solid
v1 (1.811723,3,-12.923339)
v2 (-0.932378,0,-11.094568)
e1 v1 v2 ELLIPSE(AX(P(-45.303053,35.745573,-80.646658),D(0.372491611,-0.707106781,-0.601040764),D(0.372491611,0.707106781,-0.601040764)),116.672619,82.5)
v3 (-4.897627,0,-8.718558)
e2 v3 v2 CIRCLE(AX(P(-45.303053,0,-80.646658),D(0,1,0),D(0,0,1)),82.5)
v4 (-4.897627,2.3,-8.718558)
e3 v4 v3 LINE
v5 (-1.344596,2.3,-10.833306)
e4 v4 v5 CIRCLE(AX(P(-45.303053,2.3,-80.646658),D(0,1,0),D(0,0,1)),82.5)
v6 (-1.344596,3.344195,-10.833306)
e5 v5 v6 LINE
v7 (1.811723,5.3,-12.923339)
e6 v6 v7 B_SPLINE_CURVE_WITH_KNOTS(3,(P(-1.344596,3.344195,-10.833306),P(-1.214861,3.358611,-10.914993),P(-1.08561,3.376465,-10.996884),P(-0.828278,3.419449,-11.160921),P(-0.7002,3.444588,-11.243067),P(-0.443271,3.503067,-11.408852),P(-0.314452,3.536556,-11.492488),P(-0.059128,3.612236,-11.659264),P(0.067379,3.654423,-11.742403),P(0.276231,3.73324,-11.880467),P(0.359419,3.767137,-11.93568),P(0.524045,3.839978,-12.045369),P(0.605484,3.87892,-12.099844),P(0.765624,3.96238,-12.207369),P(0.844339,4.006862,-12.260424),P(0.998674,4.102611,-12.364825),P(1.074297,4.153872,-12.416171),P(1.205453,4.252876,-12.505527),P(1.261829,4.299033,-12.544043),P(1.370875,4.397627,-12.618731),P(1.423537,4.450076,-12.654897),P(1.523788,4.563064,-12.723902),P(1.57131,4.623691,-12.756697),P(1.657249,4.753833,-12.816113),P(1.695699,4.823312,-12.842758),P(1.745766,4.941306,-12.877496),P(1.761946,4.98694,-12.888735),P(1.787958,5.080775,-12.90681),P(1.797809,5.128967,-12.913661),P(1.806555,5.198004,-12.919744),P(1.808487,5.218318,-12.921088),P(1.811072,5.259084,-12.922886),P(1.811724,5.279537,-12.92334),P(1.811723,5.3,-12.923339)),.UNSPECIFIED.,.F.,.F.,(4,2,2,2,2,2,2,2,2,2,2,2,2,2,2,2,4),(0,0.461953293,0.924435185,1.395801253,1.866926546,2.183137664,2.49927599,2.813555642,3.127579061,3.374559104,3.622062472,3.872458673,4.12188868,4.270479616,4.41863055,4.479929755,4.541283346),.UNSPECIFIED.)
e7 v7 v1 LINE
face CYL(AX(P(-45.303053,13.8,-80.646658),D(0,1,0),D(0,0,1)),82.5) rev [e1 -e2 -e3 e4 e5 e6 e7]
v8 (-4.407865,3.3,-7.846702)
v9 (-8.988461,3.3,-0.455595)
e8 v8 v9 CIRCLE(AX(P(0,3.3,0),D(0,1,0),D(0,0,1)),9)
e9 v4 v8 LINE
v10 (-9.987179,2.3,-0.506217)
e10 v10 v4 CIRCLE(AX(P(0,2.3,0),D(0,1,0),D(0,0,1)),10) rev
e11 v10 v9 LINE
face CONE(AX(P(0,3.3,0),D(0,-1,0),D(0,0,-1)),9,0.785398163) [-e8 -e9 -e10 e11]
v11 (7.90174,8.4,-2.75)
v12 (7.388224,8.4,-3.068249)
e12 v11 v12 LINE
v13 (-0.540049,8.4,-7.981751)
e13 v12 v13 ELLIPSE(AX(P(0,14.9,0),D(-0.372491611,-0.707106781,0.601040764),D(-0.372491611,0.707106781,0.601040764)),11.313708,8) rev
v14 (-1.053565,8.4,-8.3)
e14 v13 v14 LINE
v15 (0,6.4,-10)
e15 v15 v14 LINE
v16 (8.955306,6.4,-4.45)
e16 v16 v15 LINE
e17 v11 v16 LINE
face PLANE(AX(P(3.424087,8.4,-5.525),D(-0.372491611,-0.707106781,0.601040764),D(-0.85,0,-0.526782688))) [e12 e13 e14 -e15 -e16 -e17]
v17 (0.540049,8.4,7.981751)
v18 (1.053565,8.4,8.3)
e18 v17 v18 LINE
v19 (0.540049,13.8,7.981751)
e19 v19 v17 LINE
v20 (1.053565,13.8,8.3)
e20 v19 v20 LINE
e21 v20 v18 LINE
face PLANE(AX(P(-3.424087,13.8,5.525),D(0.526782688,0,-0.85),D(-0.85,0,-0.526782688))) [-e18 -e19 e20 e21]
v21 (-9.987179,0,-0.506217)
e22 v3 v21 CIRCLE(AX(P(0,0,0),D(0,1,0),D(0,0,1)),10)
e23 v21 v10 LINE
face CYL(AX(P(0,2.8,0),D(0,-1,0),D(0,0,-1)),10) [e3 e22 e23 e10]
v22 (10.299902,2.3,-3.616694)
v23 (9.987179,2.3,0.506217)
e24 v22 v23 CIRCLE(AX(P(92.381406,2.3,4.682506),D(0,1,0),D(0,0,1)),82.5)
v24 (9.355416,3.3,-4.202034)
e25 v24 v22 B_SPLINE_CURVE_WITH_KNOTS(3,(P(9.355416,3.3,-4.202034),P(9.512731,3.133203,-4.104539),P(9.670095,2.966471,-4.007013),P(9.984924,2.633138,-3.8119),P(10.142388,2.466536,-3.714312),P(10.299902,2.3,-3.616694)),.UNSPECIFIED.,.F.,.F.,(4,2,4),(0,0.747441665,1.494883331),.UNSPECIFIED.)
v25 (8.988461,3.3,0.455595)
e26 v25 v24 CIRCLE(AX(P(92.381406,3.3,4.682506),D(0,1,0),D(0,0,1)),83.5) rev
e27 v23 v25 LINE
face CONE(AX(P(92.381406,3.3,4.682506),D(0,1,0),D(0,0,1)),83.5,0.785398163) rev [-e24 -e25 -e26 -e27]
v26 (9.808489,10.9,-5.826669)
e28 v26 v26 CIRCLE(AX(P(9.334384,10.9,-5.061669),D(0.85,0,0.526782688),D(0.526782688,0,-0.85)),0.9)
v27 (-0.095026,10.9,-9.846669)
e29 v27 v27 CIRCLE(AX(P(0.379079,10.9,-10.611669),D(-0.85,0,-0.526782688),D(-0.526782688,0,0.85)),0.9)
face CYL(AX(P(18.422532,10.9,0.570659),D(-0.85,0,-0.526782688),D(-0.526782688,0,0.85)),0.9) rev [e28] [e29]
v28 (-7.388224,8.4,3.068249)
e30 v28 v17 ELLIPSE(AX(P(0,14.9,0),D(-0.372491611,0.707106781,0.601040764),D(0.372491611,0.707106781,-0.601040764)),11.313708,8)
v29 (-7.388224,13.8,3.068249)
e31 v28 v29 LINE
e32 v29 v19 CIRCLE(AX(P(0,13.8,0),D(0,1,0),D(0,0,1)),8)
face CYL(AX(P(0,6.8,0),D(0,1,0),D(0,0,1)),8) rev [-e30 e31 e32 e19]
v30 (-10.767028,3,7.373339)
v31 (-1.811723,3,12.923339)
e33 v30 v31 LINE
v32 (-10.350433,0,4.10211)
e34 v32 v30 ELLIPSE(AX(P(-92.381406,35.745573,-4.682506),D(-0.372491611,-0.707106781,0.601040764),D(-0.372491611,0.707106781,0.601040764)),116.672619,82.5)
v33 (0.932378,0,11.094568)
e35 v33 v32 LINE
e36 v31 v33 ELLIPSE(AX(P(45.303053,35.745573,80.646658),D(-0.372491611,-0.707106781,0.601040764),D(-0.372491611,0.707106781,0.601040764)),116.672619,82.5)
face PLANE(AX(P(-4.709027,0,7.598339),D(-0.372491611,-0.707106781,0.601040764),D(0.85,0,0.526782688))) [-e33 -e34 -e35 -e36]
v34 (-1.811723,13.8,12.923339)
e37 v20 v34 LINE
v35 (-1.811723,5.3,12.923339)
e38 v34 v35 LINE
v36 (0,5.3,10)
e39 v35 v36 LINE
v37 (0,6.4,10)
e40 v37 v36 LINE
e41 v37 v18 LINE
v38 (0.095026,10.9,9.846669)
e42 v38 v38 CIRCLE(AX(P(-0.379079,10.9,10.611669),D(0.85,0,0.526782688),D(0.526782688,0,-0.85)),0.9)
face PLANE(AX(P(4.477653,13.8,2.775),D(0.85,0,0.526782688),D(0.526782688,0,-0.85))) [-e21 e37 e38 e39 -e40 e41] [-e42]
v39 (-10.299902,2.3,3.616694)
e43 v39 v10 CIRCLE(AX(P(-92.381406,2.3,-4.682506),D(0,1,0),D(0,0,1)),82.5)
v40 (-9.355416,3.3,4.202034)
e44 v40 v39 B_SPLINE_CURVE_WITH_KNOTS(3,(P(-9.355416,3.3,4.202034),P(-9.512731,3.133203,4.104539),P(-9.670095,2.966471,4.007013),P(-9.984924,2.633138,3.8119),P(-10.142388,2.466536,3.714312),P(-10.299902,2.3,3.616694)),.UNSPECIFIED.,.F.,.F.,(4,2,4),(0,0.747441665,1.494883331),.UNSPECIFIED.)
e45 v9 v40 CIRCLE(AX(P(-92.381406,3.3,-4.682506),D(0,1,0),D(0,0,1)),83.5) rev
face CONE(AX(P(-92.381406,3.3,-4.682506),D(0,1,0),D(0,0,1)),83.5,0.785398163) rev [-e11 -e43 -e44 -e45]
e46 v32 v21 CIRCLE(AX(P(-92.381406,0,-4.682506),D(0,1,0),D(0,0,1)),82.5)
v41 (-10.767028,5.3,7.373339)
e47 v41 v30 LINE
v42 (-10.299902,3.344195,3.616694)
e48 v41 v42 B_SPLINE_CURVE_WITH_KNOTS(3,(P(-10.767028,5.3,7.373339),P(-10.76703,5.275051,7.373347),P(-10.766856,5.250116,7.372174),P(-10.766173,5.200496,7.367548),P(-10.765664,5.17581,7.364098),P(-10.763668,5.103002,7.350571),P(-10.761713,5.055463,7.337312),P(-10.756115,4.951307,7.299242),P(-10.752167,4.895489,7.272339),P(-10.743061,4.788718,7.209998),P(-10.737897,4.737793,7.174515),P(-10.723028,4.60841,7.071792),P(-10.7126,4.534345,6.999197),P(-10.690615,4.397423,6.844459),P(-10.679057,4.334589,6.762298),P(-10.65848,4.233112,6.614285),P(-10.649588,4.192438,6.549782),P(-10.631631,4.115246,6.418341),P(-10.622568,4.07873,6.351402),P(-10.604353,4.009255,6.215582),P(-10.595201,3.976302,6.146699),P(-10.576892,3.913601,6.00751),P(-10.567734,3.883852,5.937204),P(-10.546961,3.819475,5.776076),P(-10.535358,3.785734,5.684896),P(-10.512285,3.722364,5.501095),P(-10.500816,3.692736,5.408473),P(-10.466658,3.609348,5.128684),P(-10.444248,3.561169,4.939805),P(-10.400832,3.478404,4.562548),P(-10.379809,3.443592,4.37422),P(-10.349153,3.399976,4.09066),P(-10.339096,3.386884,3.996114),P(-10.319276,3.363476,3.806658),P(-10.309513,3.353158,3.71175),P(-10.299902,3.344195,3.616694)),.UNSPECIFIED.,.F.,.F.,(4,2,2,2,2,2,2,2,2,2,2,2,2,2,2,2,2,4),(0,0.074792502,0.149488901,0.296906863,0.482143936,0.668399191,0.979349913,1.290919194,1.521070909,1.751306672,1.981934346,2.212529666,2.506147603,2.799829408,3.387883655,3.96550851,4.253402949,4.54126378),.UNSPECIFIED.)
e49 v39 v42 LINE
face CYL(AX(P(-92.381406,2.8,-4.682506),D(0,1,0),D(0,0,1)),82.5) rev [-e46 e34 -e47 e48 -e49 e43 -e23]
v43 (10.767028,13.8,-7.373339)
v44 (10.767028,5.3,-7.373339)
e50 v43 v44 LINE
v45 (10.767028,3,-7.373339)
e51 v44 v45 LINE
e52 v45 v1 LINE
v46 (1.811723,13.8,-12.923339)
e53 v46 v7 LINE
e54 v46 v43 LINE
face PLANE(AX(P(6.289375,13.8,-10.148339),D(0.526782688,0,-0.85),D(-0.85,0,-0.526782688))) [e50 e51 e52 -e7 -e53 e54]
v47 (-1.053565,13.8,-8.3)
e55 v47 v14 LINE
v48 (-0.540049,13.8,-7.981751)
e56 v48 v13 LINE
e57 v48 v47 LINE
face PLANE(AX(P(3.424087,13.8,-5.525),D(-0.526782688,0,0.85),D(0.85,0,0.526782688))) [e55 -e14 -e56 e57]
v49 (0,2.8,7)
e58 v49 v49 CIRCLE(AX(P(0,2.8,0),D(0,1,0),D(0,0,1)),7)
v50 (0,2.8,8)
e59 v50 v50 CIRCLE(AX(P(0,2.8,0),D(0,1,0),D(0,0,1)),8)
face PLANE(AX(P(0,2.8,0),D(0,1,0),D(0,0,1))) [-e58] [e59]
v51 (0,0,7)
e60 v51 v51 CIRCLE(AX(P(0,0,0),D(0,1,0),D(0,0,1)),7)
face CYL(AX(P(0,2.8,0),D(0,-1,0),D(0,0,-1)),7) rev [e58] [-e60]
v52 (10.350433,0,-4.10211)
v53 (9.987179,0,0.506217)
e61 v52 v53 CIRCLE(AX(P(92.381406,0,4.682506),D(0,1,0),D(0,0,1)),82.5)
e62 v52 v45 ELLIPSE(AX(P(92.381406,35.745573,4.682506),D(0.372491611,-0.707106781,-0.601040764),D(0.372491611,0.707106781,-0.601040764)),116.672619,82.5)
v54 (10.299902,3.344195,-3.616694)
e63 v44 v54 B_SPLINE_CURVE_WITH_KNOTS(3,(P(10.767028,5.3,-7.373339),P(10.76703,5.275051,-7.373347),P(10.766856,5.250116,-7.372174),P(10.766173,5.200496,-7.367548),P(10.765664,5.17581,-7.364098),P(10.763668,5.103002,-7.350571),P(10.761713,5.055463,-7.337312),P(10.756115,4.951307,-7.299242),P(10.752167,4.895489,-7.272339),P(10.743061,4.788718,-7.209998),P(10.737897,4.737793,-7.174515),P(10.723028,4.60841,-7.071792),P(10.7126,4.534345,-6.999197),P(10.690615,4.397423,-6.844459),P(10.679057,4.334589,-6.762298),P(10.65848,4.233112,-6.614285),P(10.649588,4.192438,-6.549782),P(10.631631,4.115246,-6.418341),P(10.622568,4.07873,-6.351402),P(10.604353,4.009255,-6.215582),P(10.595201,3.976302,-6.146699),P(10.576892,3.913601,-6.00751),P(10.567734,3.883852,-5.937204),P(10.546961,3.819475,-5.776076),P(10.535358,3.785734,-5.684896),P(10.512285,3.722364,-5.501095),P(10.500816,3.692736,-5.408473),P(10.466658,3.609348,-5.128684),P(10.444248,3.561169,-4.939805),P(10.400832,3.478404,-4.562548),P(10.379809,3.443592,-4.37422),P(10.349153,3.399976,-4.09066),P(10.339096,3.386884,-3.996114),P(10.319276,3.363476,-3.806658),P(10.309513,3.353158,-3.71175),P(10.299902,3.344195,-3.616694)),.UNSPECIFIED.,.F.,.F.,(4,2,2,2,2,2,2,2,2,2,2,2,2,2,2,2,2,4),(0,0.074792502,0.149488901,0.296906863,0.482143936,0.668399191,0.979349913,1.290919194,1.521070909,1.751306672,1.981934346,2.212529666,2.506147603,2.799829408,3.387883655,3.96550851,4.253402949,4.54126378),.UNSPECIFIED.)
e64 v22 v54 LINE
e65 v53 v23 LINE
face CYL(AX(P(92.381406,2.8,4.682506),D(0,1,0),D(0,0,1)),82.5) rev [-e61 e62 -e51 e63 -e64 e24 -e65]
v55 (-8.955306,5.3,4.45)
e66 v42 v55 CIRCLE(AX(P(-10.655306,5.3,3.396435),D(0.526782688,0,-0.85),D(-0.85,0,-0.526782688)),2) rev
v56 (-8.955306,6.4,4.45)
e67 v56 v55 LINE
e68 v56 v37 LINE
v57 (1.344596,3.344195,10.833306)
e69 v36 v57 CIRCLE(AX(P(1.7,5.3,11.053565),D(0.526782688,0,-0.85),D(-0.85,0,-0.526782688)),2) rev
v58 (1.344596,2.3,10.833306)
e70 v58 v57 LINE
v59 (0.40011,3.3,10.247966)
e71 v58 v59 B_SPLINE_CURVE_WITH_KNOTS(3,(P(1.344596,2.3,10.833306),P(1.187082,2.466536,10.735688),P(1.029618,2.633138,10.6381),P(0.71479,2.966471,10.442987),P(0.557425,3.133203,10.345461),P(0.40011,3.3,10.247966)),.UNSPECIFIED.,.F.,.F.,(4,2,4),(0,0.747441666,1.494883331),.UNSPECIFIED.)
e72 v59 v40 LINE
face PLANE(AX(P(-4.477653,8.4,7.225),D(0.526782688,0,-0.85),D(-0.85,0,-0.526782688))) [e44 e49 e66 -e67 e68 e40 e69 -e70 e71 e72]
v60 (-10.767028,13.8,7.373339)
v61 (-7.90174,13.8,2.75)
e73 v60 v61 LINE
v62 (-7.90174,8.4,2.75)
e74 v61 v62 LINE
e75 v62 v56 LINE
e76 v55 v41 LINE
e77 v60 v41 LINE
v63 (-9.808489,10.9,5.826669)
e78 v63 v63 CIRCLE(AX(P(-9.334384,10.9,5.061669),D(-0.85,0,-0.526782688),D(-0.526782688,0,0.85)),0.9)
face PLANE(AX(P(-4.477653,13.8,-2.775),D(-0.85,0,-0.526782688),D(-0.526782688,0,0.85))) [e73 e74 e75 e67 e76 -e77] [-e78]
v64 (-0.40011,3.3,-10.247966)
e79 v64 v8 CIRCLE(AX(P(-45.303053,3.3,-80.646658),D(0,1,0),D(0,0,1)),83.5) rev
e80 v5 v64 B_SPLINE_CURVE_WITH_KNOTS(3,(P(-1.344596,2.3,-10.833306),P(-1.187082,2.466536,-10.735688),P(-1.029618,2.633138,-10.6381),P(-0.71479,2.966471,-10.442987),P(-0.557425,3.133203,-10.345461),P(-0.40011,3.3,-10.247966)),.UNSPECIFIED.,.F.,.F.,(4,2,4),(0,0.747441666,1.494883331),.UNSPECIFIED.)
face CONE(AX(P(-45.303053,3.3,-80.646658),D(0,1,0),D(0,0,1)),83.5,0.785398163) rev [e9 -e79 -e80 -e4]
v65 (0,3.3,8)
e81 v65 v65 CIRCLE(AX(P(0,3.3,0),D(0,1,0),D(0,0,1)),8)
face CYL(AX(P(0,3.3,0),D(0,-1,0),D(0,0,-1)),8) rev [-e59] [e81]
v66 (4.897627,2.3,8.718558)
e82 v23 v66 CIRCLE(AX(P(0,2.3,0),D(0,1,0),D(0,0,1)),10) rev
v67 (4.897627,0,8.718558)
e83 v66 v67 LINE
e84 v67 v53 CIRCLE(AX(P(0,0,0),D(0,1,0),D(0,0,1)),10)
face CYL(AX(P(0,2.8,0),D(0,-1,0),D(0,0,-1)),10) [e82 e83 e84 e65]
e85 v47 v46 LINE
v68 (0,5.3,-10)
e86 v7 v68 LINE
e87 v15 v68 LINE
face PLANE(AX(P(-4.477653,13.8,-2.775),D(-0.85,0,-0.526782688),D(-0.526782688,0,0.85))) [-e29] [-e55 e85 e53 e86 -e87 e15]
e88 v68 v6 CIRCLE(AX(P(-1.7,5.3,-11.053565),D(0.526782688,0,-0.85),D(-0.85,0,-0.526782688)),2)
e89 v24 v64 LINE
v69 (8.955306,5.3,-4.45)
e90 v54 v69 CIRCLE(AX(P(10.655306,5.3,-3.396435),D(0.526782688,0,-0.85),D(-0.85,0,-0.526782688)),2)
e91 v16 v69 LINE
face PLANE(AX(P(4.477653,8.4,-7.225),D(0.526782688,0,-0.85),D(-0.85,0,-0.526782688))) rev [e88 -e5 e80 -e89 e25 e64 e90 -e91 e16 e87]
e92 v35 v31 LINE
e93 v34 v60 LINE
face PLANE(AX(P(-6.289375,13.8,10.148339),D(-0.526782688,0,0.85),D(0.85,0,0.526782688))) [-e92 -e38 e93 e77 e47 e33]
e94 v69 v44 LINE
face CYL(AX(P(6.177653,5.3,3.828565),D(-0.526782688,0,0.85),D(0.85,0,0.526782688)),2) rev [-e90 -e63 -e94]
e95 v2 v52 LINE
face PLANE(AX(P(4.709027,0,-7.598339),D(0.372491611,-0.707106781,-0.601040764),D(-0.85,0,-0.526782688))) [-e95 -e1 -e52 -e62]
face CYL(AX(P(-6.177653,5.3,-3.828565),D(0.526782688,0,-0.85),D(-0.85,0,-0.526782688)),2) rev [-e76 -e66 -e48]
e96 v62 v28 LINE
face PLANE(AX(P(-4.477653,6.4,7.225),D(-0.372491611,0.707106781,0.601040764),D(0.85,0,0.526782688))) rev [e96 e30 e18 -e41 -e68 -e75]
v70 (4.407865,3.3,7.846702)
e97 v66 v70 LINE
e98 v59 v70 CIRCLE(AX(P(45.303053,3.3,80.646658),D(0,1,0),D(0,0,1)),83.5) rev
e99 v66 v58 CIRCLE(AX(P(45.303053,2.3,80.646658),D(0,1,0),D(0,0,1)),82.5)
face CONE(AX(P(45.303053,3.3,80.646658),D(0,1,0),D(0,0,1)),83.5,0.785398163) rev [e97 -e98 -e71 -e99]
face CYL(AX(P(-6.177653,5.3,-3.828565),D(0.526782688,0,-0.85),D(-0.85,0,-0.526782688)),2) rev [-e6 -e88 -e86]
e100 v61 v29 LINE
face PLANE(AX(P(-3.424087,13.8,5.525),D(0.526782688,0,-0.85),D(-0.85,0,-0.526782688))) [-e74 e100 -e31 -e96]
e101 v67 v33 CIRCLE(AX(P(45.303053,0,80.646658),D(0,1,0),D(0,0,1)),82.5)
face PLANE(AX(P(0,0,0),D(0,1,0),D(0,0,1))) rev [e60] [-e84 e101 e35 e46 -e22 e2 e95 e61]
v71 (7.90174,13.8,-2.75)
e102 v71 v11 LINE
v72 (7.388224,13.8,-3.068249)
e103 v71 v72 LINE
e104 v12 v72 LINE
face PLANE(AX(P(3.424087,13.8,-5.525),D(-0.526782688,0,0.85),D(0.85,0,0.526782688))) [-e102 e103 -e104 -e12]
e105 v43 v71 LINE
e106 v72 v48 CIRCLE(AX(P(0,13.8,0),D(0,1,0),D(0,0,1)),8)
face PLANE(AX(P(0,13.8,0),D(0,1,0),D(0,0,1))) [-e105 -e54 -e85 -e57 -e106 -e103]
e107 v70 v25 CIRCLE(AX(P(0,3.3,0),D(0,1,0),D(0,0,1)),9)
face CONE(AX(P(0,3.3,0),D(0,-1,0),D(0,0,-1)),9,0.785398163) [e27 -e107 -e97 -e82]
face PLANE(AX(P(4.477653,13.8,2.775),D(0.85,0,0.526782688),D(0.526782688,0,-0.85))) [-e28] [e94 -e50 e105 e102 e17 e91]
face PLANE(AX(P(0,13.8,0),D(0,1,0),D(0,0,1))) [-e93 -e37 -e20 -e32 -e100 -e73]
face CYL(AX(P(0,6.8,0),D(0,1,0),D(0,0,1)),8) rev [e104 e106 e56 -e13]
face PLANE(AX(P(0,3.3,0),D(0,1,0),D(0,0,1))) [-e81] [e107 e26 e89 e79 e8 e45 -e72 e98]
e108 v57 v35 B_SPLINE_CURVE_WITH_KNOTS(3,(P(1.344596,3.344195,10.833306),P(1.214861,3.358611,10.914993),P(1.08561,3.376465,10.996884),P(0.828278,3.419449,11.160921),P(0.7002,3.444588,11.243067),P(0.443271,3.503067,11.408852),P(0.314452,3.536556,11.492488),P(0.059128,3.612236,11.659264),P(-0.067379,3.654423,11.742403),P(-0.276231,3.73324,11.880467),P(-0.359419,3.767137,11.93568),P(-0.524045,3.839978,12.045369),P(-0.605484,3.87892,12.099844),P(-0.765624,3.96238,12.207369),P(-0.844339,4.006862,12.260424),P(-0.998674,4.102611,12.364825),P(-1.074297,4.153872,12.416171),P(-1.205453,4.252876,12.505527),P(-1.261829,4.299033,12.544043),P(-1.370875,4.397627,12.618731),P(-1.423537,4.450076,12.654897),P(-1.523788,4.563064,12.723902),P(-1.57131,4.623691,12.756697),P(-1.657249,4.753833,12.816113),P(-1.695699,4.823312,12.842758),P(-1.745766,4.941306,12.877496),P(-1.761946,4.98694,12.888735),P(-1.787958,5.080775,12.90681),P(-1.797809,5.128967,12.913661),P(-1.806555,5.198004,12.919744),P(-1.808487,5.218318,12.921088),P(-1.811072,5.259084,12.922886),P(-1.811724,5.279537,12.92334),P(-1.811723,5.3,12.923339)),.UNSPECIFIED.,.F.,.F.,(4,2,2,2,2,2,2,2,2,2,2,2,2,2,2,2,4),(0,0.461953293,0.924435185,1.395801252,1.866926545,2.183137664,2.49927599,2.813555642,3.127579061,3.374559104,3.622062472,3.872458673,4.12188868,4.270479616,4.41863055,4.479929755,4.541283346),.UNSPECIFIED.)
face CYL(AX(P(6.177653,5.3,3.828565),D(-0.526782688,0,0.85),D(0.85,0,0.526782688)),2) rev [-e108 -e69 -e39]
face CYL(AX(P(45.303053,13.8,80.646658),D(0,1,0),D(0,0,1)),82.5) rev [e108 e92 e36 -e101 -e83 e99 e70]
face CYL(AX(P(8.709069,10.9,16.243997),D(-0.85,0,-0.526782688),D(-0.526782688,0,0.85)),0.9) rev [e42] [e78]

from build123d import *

# Parameters (mm, degrees)
SKETCH_1_R          = 10
SKETCH_1_R_2        = 7
EXTRUDE_1_DEPTH     = 2.8
SKETCH_2_R          = 10
SKETCH_2_R_2        = 8
EXTRUDE_2_DEPTH     = 0.5
EXTRUDE_3_DEPTH     = 8.4
EXTRUDE_4_DEPTH     = 5.4
SKETCH_7_R          = 0.9
CUT_EXTRUDE_1_DEPTH = 26.870410541
CHAMFER_2_SIZE      = 2
EXTRUDE_5_REACH     = 23.757
FILLET_2_R          = 82.5
CHAMFER_4_SIZE      = 3
FILLET_3_R          = 2
CUT_EXTRUDE_START   = -7
SKETCH_9_R          = 8
CUT_EXTRUDE_2_DEPTH = 7
CHAMFER_5_SIZE      = 1


with BuildPart() as part:
    # 草图1 → 凸台-拉伸1 (new body)
    with BuildSketch(Plane(origin=(0, 0, 0), x_dir=(1, 0, 0), z_dir=(0, 1, 0))):
        with Locations(Location((0, 0, 0), (0, 0, 270))):
            Circle(SKETCH_1_R)
        with Locations(Location((0, 0, 0), (0, 0, 270))):
            Circle(SKETCH_1_R_2, mode=Mode.SUBTRACT)
    extrude(amount=EXTRUDE_1_DEPTH)

    # 草图2 → 凸台-拉伸2 (add)
    with BuildSketch(Plane(origin=(0, 2.8, 0), x_dir=(1, 0, 0), z_dir=(0, 1, 0))):
        with Locations(Location((0, 0, 0), (0, 0, 270))):
            Circle(SKETCH_2_R)
        with Locations(Location((0, 0, 0), (0, 0, 270))):
            Circle(SKETCH_2_R_2, mode=Mode.SUBTRACT)
    extrude(amount=EXTRUDE_2_DEPTH)

    # 草图3 → 凸台-拉伸3 (add)
    with BuildSketch(Plane.XZ):
        with BuildLine():
            ThreePointArc((0, 10), (-5.267826876, 8.5), (-8.95530569, 4.45))
            Line((-8.95530569, 4.45), (0, 10))
        make_face()
        with BuildLine():
            Line((8.95530569, -4.45), (0, -10))
            ThreePointArc((0, -10), (5.267826876, -8.5), (8.95530569, -4.45))
        make_face()
    extrude(amount=-EXTRUDE_3_DEPTH)

    # 草图5 → 凸台-拉伸4 (add)
    with BuildSketch(Plane(origin=(0, 8.4, 0), x_dir=(1, 0, 0), z_dir=(0, 1, 0))):
        Polygon((1.811722614, 12.923338709), (10.767028304, 7.373338709), (7.901740315, 2.75), (-1.053565375, 8.3), align=None)
        Polygon((-7.901740315, -2.75), (1.053565375, -8.3), (-1.811722614, -12.923338709), (-10.767028304, -7.373338709), align=None)
    extrude(amount=EXTRUDE_4_DEPTH)

    # 草图7 → 切除-拉伸1 (cut, through all)
    with BuildSketch(Plane(origin=(-4.477652845, 0, -2.775), x_dir=(-0.5267826876426366, 0, 0.8500000000000003), z_dir=(-0.8500000000000003, 0, -0.5267826876426366))):
        with Locations((9.219611005, 10.9)):
            Circle(SKETCH_7_R)
        with Locations((-9.219611005, 10.9)):
            Circle(SKETCH_7_R)
    extrude(amount=-CUT_EXTRUDE_1_DEPTH, mode=Mode.SUBTRACT)

    # 倒角2
    # the kernel refuses this chamfer: 2 mm, written as the material it adds along each edge
    with BuildSketch(Plane(origin=(-8.95530569, 8.4, 4.45), x_dir=(0, -1, 0), z_dir=(0.8500000000000002, 0, 0.5267826876426367))) as chamfer_2_piece_1_section:
        Polygon((CHAMFER_2_SIZE, 0), (0, CHAMFER_2_SIZE), (0, 0), align=None)
    chamfer_2_piece_1 = extrude(amount=10.535653753, mode=Mode.PRIVATE)
    chamfer_2_piece_1 = chamfer_2_piece_1 & Plane(origin=(0, 8.4, 0), x_dir=(0, 0, 1), z_dir=(0, -1, 0)) * Cylinder(10, 30, mode=Mode.PRIVATE)
    chamfer_2_piece_1 = split(chamfer_2_piece_1, bisect_by=Plane(origin=(-7.901740315, 8.4, 2.75), z_dir=(-0.5267826876426371, 0, 0.85)), keep=Keep.TOP, mode=Mode.PRIVATE)
    add(chamfer_2_piece_1)
    with BuildSketch(Plane(origin=(8.95530569, 8.4, -4.45), x_dir=(-0.5267826876426367, 0, 0.8500000000000002), z_dir=(-0.8500000000000002, 0, -0.5267826876426367))) as chamfer_2_piece_2_section:
        Polygon((CHAMFER_2_SIZE, 0), (0, -CHAMFER_2_SIZE), (0, 0), align=None)
    chamfer_2_piece_2 = extrude(amount=10.535653753, mode=Mode.PRIVATE)
    chamfer_2_piece_2 = chamfer_2_piece_2 & Plane(origin=(0, 8.4, 0), x_dir=(0, 0, -1), z_dir=(0, -1, 0)) * Cylinder(10, 30, mode=Mode.PRIVATE)
    chamfer_2_piece_2 = split(chamfer_2_piece_2, bisect_by=Plane(origin=(7.901740315, 8.4, -2.75), z_dir=(0.5267826876426374, 0, -0.8499999999999999)), keep=Keep.TOP, mode=Mode.PRIVATE)
    add(chamfer_2_piece_2)

    # 草图8 → 凸台-拉伸5 (add, up to next)
    with BuildSketch(Plane.XZ, mode=Mode.PRIVATE) as extrude_5_sk1:
        with BuildLine():
            Line((10.767028304, -7.373338709), (8.95530569, -4.45))
            ThreePointArc((8.95530569, -4.45), (5.267826876, -8.5), (0, -10))
            Line((0, -10), (1.811722614, -12.923338709))
            Line((1.811722614, -12.923338709), (10.767028304, -7.373338709))
        make_face()
    extrude_5_tool1 = extrude(extrude_5_sk1.sketch, amount=-EXTRUDE_5_REACH, mode=Mode.PRIVATE) - part.part
    # 草图8 → 凸台-拉伸5 (add, up to next)
    with BuildSketch(Plane.XZ, mode=Mode.PRIVATE) as extrude_5_sk2:
        with BuildLine():
            Line((-10.767028304, 7.373338709), (-8.95530569, 4.45))
            ThreePointArc((-8.95530569, 4.45), (-5.267826876, 8.5), (0, 10))
            Line((0, 10), (-1.811722614, 12.923338709))
            Line((-1.811722614, 12.923338709), (-10.767028304, 7.373338709))
        make_face()
    extrude_5_tool2 = extrude(extrude_5_sk2.sketch, amount=-EXTRUDE_5_REACH, mode=Mode.PRIVATE) - part.part
    add(extrude_5_tool1.solids().sort_by_distance((5.629921, 0, -9.084263))[0])
    add(extrude_5_tool2.solids().sort_by_distance((-5.629921, 0, 9.084263))[0])

    # 圆角2
    # the kernel refuses this fillet: 82.5 mm, written as the material it adds along each edge
    with BuildSketch(Plane(origin=(0, 0, -10), x_dir=(0.526782687642631, 0, -0.8500000000000036), z_dir=(0, 1, 0))) as fillet_2_piece_1:
        with BuildLine():
            CenterArc((36.184795451, 75.723030975), FILLET_2_R, 241.113318321, 5.501155307)
            ThreePointArc((-3.669211303, 3.48794154), (-1.610231073, 1.980006188), (0, 0))
            Line((0, 0), (3.43922201, 0))
        make_face()
    extrude(amount=3.3)
    with BuildSketch(Plane(origin=(8.95530569, 0, -4.45), x_dir=(0.203827060688438, 0, 0.9790069097463571), z_dir=(0, 1, 0))) as fillet_2_piece_2:
        with BuildLine():
            CenterArc((25.945282898, 79.813276697), FILLET_2_R, 249.836350841, 5.501155307)
            Line((-2.4926907, 2.369544494), (0, 0))
            ThreePointArc((0, 0), (2.531247112, 0.325663431), (5.062494224, 0))
        make_face()
    extrude(amount=3.3)
    with BuildSketch(Plane(origin=(0, 3.3, 10), x_dir=(-0.5267826876443492, 0, 0.8499999999989388), z_dir=(0, -1, 0)), Plane(origin=(-8.95530569, 0, 4.45), x_dir=(-0.5267826876426422, 0, 0.8499999999999966), z_dir=(0, 1, 0))) as fillet_2_piece_3:
        with BuildLine():
            CenterArc((36.184795451, -75.723030975), FILLET_2_R, 113.385526372, 5.501155307)
            ThreePointArc((-3.669211303, -3.48794154), (-1.610231073, -1.980006188), (0, 0))
            Line((0, 0), (3.43922201, 0))
        make_face()
    extrude(amount=3.3)

    # 倒角4
    chamfer_4_edges = [part.edges().sort_by_distance(p)[0] for p in [
        (6.289375459, 0, -10.148338709),
        (-6.289375459, 0, 10.148338709),
    ]]
    chamfer(chamfer_4_edges, length=CHAMFER_4_SIZE)

    # 圆角3
    # the kernel refuses this fillet: 2 mm, written as the material it adds along each edge
    with BuildSketch(Plane(origin=(0, 3.3, -10), x_dir=(-0.8499999999998374, 0, -0.5267826876428993), z_dir=(0.5267826876428993, 0, -0.8499999999998374))) as fillet_3_piece_1_section:
        with BuildLine():
            CenterArc((FILLET_3_R, FILLET_3_R), FILLET_3_R, 180, 90)
            Line((0, FILLET_3_R), (0, 0))
            Line((0, 0), (FILLET_3_R, 0))
        make_face()
    fillet_3_piece_1 = extrude(amount=3.43922201, mode=Mode.PRIVATE)
    fillet_3_piece_1 = fillet_3_piece_1 - Plane(origin=(-45.303052529, 3.3, -80.646657907), x_dir=(0.5267826876428993, 0, -0.8499999999998374), z_dir=(0, -1, 0)) * Cylinder(82.5, 15, mode=Mode.PRIVATE)
    add(fillet_3_piece_1)
    with BuildSketch(Plane(origin=(-8.95530569, 3.3, 4.45), x_dir=(-0.8499999999998374, 0, -0.5267826876428994), z_dir=(-0.5267826876428993, 0, 0.8499999999998374))) as fillet_3_piece_2_section:
        with BuildLine():
            CenterArc((FILLET_3_R, -FILLET_3_R), FILLET_3_R, 90, 90)
            Line((0, -FILLET_3_R), (0, 0))
            Line((0, 0), (FILLET_3_R, 0))
        make_face()
    fillet_3_piece_2 = extrude(amount=3.43922201, mode=Mode.PRIVATE)
    fillet_3_piece_2 = fillet_3_piece_2 - Plane(origin=(-92.381405818, 3.3, -4.682505639), x_dir=(-0.5267826876428993, 0, 0.8499999999998374), z_dir=(0, -1, 0)) * Cylinder(82.5, 15, mode=Mode.PRIVATE)
    add(fillet_3_piece_2)
    with BuildSketch(Plane(origin=(10.767028304, 3.3, -7.373338709), x_dir=(0.8499999999997903, 0, 0.5267826876429756), z_dir=(-0.5267826876429755, 0, 0.8499999999997901))) as fillet_3_piece_3_section:
        with BuildLine():
            CenterArc((FILLET_3_R, FILLET_3_R), FILLET_3_R, 180, 90)
            Line((0, FILLET_3_R), (0, 0))
            Line((0, 0), (FILLET_3_R, 0))
        make_face()
    fillet_3_piece_3 = extrude(amount=3.43922201, mode=Mode.PRIVATE)
    fillet_3_piece_3 = fillet_3_piece_3 - Plane(origin=(92.381405818, 3.3, 4.68250564), x_dir=(0.20382706068808945, 0, 0.9790069097464297), z_dir=(0, -1, 0)) * Cylinder(82.5, 15, mode=Mode.PRIVATE)
    add(fillet_3_piece_3)
    with BuildSketch(Plane(origin=(0, 3.3, 10), x_dir=(0.8499999999991121, 0, 0.5267826876440694), z_dir=(-0.5267826876440695, 0, 0.8499999999991122))) as fillet_3_piece_4_section:
        with BuildLine():
            CenterArc((FILLET_3_R, FILLET_3_R), FILLET_3_R, 180, 90)
            Line((0, FILLET_3_R), (0, 0))
            Line((0, 0), (FILLET_3_R, 0))
        make_face()
    fillet_3_piece_4 = extrude(amount=3.43922201, mode=Mode.PRIVATE)
    fillet_3_piece_4 = fillet_3_piece_4 - Plane(origin=(45.303052529, 3.3, 80.646657907), x_dir=(-0.5267826876440695, 0, 0.8499999999991122), z_dir=(0, 1, 0)) * Cylinder(82.5, 15, mode=Mode.PRIVATE)
    add(fillet_3_piece_4)

    # 草图9 → 切除-拉伸2 (cut)
    with BuildSketch(Plane(origin=(0, 13.8, 0), x_dir=(1, 0, 0), z_dir=(0, 1, 0)).offset(CUT_EXTRUDE_START)):
        with Locations(Location((0, 0, 0), (0, 0, 270))):
            Circle(SKETCH_9_R)
    extrude(amount=CUT_EXTRUDE_2_DEPTH, mode=Mode.SUBTRACT)

    # 倒角5
    chamfer_5_edges = [part.edges().sort_by_distance(p)[0] for p in [
        (-8.5, 3.3, -5.267826876),
        (8.5, 3.3, 5.267826876),
        (-10.117707279, 3.3, 1.557198087),
        (10.117707279, 3.3, -1.557198087),
        (3.10786125, 3.3, 9.753669305),
        (-3.10786125, 3.3, -9.753669305),
    ]]
    chamfer(chamfer_5_edges, length=CHAMFER_5_SIZE)


solid = part.part
